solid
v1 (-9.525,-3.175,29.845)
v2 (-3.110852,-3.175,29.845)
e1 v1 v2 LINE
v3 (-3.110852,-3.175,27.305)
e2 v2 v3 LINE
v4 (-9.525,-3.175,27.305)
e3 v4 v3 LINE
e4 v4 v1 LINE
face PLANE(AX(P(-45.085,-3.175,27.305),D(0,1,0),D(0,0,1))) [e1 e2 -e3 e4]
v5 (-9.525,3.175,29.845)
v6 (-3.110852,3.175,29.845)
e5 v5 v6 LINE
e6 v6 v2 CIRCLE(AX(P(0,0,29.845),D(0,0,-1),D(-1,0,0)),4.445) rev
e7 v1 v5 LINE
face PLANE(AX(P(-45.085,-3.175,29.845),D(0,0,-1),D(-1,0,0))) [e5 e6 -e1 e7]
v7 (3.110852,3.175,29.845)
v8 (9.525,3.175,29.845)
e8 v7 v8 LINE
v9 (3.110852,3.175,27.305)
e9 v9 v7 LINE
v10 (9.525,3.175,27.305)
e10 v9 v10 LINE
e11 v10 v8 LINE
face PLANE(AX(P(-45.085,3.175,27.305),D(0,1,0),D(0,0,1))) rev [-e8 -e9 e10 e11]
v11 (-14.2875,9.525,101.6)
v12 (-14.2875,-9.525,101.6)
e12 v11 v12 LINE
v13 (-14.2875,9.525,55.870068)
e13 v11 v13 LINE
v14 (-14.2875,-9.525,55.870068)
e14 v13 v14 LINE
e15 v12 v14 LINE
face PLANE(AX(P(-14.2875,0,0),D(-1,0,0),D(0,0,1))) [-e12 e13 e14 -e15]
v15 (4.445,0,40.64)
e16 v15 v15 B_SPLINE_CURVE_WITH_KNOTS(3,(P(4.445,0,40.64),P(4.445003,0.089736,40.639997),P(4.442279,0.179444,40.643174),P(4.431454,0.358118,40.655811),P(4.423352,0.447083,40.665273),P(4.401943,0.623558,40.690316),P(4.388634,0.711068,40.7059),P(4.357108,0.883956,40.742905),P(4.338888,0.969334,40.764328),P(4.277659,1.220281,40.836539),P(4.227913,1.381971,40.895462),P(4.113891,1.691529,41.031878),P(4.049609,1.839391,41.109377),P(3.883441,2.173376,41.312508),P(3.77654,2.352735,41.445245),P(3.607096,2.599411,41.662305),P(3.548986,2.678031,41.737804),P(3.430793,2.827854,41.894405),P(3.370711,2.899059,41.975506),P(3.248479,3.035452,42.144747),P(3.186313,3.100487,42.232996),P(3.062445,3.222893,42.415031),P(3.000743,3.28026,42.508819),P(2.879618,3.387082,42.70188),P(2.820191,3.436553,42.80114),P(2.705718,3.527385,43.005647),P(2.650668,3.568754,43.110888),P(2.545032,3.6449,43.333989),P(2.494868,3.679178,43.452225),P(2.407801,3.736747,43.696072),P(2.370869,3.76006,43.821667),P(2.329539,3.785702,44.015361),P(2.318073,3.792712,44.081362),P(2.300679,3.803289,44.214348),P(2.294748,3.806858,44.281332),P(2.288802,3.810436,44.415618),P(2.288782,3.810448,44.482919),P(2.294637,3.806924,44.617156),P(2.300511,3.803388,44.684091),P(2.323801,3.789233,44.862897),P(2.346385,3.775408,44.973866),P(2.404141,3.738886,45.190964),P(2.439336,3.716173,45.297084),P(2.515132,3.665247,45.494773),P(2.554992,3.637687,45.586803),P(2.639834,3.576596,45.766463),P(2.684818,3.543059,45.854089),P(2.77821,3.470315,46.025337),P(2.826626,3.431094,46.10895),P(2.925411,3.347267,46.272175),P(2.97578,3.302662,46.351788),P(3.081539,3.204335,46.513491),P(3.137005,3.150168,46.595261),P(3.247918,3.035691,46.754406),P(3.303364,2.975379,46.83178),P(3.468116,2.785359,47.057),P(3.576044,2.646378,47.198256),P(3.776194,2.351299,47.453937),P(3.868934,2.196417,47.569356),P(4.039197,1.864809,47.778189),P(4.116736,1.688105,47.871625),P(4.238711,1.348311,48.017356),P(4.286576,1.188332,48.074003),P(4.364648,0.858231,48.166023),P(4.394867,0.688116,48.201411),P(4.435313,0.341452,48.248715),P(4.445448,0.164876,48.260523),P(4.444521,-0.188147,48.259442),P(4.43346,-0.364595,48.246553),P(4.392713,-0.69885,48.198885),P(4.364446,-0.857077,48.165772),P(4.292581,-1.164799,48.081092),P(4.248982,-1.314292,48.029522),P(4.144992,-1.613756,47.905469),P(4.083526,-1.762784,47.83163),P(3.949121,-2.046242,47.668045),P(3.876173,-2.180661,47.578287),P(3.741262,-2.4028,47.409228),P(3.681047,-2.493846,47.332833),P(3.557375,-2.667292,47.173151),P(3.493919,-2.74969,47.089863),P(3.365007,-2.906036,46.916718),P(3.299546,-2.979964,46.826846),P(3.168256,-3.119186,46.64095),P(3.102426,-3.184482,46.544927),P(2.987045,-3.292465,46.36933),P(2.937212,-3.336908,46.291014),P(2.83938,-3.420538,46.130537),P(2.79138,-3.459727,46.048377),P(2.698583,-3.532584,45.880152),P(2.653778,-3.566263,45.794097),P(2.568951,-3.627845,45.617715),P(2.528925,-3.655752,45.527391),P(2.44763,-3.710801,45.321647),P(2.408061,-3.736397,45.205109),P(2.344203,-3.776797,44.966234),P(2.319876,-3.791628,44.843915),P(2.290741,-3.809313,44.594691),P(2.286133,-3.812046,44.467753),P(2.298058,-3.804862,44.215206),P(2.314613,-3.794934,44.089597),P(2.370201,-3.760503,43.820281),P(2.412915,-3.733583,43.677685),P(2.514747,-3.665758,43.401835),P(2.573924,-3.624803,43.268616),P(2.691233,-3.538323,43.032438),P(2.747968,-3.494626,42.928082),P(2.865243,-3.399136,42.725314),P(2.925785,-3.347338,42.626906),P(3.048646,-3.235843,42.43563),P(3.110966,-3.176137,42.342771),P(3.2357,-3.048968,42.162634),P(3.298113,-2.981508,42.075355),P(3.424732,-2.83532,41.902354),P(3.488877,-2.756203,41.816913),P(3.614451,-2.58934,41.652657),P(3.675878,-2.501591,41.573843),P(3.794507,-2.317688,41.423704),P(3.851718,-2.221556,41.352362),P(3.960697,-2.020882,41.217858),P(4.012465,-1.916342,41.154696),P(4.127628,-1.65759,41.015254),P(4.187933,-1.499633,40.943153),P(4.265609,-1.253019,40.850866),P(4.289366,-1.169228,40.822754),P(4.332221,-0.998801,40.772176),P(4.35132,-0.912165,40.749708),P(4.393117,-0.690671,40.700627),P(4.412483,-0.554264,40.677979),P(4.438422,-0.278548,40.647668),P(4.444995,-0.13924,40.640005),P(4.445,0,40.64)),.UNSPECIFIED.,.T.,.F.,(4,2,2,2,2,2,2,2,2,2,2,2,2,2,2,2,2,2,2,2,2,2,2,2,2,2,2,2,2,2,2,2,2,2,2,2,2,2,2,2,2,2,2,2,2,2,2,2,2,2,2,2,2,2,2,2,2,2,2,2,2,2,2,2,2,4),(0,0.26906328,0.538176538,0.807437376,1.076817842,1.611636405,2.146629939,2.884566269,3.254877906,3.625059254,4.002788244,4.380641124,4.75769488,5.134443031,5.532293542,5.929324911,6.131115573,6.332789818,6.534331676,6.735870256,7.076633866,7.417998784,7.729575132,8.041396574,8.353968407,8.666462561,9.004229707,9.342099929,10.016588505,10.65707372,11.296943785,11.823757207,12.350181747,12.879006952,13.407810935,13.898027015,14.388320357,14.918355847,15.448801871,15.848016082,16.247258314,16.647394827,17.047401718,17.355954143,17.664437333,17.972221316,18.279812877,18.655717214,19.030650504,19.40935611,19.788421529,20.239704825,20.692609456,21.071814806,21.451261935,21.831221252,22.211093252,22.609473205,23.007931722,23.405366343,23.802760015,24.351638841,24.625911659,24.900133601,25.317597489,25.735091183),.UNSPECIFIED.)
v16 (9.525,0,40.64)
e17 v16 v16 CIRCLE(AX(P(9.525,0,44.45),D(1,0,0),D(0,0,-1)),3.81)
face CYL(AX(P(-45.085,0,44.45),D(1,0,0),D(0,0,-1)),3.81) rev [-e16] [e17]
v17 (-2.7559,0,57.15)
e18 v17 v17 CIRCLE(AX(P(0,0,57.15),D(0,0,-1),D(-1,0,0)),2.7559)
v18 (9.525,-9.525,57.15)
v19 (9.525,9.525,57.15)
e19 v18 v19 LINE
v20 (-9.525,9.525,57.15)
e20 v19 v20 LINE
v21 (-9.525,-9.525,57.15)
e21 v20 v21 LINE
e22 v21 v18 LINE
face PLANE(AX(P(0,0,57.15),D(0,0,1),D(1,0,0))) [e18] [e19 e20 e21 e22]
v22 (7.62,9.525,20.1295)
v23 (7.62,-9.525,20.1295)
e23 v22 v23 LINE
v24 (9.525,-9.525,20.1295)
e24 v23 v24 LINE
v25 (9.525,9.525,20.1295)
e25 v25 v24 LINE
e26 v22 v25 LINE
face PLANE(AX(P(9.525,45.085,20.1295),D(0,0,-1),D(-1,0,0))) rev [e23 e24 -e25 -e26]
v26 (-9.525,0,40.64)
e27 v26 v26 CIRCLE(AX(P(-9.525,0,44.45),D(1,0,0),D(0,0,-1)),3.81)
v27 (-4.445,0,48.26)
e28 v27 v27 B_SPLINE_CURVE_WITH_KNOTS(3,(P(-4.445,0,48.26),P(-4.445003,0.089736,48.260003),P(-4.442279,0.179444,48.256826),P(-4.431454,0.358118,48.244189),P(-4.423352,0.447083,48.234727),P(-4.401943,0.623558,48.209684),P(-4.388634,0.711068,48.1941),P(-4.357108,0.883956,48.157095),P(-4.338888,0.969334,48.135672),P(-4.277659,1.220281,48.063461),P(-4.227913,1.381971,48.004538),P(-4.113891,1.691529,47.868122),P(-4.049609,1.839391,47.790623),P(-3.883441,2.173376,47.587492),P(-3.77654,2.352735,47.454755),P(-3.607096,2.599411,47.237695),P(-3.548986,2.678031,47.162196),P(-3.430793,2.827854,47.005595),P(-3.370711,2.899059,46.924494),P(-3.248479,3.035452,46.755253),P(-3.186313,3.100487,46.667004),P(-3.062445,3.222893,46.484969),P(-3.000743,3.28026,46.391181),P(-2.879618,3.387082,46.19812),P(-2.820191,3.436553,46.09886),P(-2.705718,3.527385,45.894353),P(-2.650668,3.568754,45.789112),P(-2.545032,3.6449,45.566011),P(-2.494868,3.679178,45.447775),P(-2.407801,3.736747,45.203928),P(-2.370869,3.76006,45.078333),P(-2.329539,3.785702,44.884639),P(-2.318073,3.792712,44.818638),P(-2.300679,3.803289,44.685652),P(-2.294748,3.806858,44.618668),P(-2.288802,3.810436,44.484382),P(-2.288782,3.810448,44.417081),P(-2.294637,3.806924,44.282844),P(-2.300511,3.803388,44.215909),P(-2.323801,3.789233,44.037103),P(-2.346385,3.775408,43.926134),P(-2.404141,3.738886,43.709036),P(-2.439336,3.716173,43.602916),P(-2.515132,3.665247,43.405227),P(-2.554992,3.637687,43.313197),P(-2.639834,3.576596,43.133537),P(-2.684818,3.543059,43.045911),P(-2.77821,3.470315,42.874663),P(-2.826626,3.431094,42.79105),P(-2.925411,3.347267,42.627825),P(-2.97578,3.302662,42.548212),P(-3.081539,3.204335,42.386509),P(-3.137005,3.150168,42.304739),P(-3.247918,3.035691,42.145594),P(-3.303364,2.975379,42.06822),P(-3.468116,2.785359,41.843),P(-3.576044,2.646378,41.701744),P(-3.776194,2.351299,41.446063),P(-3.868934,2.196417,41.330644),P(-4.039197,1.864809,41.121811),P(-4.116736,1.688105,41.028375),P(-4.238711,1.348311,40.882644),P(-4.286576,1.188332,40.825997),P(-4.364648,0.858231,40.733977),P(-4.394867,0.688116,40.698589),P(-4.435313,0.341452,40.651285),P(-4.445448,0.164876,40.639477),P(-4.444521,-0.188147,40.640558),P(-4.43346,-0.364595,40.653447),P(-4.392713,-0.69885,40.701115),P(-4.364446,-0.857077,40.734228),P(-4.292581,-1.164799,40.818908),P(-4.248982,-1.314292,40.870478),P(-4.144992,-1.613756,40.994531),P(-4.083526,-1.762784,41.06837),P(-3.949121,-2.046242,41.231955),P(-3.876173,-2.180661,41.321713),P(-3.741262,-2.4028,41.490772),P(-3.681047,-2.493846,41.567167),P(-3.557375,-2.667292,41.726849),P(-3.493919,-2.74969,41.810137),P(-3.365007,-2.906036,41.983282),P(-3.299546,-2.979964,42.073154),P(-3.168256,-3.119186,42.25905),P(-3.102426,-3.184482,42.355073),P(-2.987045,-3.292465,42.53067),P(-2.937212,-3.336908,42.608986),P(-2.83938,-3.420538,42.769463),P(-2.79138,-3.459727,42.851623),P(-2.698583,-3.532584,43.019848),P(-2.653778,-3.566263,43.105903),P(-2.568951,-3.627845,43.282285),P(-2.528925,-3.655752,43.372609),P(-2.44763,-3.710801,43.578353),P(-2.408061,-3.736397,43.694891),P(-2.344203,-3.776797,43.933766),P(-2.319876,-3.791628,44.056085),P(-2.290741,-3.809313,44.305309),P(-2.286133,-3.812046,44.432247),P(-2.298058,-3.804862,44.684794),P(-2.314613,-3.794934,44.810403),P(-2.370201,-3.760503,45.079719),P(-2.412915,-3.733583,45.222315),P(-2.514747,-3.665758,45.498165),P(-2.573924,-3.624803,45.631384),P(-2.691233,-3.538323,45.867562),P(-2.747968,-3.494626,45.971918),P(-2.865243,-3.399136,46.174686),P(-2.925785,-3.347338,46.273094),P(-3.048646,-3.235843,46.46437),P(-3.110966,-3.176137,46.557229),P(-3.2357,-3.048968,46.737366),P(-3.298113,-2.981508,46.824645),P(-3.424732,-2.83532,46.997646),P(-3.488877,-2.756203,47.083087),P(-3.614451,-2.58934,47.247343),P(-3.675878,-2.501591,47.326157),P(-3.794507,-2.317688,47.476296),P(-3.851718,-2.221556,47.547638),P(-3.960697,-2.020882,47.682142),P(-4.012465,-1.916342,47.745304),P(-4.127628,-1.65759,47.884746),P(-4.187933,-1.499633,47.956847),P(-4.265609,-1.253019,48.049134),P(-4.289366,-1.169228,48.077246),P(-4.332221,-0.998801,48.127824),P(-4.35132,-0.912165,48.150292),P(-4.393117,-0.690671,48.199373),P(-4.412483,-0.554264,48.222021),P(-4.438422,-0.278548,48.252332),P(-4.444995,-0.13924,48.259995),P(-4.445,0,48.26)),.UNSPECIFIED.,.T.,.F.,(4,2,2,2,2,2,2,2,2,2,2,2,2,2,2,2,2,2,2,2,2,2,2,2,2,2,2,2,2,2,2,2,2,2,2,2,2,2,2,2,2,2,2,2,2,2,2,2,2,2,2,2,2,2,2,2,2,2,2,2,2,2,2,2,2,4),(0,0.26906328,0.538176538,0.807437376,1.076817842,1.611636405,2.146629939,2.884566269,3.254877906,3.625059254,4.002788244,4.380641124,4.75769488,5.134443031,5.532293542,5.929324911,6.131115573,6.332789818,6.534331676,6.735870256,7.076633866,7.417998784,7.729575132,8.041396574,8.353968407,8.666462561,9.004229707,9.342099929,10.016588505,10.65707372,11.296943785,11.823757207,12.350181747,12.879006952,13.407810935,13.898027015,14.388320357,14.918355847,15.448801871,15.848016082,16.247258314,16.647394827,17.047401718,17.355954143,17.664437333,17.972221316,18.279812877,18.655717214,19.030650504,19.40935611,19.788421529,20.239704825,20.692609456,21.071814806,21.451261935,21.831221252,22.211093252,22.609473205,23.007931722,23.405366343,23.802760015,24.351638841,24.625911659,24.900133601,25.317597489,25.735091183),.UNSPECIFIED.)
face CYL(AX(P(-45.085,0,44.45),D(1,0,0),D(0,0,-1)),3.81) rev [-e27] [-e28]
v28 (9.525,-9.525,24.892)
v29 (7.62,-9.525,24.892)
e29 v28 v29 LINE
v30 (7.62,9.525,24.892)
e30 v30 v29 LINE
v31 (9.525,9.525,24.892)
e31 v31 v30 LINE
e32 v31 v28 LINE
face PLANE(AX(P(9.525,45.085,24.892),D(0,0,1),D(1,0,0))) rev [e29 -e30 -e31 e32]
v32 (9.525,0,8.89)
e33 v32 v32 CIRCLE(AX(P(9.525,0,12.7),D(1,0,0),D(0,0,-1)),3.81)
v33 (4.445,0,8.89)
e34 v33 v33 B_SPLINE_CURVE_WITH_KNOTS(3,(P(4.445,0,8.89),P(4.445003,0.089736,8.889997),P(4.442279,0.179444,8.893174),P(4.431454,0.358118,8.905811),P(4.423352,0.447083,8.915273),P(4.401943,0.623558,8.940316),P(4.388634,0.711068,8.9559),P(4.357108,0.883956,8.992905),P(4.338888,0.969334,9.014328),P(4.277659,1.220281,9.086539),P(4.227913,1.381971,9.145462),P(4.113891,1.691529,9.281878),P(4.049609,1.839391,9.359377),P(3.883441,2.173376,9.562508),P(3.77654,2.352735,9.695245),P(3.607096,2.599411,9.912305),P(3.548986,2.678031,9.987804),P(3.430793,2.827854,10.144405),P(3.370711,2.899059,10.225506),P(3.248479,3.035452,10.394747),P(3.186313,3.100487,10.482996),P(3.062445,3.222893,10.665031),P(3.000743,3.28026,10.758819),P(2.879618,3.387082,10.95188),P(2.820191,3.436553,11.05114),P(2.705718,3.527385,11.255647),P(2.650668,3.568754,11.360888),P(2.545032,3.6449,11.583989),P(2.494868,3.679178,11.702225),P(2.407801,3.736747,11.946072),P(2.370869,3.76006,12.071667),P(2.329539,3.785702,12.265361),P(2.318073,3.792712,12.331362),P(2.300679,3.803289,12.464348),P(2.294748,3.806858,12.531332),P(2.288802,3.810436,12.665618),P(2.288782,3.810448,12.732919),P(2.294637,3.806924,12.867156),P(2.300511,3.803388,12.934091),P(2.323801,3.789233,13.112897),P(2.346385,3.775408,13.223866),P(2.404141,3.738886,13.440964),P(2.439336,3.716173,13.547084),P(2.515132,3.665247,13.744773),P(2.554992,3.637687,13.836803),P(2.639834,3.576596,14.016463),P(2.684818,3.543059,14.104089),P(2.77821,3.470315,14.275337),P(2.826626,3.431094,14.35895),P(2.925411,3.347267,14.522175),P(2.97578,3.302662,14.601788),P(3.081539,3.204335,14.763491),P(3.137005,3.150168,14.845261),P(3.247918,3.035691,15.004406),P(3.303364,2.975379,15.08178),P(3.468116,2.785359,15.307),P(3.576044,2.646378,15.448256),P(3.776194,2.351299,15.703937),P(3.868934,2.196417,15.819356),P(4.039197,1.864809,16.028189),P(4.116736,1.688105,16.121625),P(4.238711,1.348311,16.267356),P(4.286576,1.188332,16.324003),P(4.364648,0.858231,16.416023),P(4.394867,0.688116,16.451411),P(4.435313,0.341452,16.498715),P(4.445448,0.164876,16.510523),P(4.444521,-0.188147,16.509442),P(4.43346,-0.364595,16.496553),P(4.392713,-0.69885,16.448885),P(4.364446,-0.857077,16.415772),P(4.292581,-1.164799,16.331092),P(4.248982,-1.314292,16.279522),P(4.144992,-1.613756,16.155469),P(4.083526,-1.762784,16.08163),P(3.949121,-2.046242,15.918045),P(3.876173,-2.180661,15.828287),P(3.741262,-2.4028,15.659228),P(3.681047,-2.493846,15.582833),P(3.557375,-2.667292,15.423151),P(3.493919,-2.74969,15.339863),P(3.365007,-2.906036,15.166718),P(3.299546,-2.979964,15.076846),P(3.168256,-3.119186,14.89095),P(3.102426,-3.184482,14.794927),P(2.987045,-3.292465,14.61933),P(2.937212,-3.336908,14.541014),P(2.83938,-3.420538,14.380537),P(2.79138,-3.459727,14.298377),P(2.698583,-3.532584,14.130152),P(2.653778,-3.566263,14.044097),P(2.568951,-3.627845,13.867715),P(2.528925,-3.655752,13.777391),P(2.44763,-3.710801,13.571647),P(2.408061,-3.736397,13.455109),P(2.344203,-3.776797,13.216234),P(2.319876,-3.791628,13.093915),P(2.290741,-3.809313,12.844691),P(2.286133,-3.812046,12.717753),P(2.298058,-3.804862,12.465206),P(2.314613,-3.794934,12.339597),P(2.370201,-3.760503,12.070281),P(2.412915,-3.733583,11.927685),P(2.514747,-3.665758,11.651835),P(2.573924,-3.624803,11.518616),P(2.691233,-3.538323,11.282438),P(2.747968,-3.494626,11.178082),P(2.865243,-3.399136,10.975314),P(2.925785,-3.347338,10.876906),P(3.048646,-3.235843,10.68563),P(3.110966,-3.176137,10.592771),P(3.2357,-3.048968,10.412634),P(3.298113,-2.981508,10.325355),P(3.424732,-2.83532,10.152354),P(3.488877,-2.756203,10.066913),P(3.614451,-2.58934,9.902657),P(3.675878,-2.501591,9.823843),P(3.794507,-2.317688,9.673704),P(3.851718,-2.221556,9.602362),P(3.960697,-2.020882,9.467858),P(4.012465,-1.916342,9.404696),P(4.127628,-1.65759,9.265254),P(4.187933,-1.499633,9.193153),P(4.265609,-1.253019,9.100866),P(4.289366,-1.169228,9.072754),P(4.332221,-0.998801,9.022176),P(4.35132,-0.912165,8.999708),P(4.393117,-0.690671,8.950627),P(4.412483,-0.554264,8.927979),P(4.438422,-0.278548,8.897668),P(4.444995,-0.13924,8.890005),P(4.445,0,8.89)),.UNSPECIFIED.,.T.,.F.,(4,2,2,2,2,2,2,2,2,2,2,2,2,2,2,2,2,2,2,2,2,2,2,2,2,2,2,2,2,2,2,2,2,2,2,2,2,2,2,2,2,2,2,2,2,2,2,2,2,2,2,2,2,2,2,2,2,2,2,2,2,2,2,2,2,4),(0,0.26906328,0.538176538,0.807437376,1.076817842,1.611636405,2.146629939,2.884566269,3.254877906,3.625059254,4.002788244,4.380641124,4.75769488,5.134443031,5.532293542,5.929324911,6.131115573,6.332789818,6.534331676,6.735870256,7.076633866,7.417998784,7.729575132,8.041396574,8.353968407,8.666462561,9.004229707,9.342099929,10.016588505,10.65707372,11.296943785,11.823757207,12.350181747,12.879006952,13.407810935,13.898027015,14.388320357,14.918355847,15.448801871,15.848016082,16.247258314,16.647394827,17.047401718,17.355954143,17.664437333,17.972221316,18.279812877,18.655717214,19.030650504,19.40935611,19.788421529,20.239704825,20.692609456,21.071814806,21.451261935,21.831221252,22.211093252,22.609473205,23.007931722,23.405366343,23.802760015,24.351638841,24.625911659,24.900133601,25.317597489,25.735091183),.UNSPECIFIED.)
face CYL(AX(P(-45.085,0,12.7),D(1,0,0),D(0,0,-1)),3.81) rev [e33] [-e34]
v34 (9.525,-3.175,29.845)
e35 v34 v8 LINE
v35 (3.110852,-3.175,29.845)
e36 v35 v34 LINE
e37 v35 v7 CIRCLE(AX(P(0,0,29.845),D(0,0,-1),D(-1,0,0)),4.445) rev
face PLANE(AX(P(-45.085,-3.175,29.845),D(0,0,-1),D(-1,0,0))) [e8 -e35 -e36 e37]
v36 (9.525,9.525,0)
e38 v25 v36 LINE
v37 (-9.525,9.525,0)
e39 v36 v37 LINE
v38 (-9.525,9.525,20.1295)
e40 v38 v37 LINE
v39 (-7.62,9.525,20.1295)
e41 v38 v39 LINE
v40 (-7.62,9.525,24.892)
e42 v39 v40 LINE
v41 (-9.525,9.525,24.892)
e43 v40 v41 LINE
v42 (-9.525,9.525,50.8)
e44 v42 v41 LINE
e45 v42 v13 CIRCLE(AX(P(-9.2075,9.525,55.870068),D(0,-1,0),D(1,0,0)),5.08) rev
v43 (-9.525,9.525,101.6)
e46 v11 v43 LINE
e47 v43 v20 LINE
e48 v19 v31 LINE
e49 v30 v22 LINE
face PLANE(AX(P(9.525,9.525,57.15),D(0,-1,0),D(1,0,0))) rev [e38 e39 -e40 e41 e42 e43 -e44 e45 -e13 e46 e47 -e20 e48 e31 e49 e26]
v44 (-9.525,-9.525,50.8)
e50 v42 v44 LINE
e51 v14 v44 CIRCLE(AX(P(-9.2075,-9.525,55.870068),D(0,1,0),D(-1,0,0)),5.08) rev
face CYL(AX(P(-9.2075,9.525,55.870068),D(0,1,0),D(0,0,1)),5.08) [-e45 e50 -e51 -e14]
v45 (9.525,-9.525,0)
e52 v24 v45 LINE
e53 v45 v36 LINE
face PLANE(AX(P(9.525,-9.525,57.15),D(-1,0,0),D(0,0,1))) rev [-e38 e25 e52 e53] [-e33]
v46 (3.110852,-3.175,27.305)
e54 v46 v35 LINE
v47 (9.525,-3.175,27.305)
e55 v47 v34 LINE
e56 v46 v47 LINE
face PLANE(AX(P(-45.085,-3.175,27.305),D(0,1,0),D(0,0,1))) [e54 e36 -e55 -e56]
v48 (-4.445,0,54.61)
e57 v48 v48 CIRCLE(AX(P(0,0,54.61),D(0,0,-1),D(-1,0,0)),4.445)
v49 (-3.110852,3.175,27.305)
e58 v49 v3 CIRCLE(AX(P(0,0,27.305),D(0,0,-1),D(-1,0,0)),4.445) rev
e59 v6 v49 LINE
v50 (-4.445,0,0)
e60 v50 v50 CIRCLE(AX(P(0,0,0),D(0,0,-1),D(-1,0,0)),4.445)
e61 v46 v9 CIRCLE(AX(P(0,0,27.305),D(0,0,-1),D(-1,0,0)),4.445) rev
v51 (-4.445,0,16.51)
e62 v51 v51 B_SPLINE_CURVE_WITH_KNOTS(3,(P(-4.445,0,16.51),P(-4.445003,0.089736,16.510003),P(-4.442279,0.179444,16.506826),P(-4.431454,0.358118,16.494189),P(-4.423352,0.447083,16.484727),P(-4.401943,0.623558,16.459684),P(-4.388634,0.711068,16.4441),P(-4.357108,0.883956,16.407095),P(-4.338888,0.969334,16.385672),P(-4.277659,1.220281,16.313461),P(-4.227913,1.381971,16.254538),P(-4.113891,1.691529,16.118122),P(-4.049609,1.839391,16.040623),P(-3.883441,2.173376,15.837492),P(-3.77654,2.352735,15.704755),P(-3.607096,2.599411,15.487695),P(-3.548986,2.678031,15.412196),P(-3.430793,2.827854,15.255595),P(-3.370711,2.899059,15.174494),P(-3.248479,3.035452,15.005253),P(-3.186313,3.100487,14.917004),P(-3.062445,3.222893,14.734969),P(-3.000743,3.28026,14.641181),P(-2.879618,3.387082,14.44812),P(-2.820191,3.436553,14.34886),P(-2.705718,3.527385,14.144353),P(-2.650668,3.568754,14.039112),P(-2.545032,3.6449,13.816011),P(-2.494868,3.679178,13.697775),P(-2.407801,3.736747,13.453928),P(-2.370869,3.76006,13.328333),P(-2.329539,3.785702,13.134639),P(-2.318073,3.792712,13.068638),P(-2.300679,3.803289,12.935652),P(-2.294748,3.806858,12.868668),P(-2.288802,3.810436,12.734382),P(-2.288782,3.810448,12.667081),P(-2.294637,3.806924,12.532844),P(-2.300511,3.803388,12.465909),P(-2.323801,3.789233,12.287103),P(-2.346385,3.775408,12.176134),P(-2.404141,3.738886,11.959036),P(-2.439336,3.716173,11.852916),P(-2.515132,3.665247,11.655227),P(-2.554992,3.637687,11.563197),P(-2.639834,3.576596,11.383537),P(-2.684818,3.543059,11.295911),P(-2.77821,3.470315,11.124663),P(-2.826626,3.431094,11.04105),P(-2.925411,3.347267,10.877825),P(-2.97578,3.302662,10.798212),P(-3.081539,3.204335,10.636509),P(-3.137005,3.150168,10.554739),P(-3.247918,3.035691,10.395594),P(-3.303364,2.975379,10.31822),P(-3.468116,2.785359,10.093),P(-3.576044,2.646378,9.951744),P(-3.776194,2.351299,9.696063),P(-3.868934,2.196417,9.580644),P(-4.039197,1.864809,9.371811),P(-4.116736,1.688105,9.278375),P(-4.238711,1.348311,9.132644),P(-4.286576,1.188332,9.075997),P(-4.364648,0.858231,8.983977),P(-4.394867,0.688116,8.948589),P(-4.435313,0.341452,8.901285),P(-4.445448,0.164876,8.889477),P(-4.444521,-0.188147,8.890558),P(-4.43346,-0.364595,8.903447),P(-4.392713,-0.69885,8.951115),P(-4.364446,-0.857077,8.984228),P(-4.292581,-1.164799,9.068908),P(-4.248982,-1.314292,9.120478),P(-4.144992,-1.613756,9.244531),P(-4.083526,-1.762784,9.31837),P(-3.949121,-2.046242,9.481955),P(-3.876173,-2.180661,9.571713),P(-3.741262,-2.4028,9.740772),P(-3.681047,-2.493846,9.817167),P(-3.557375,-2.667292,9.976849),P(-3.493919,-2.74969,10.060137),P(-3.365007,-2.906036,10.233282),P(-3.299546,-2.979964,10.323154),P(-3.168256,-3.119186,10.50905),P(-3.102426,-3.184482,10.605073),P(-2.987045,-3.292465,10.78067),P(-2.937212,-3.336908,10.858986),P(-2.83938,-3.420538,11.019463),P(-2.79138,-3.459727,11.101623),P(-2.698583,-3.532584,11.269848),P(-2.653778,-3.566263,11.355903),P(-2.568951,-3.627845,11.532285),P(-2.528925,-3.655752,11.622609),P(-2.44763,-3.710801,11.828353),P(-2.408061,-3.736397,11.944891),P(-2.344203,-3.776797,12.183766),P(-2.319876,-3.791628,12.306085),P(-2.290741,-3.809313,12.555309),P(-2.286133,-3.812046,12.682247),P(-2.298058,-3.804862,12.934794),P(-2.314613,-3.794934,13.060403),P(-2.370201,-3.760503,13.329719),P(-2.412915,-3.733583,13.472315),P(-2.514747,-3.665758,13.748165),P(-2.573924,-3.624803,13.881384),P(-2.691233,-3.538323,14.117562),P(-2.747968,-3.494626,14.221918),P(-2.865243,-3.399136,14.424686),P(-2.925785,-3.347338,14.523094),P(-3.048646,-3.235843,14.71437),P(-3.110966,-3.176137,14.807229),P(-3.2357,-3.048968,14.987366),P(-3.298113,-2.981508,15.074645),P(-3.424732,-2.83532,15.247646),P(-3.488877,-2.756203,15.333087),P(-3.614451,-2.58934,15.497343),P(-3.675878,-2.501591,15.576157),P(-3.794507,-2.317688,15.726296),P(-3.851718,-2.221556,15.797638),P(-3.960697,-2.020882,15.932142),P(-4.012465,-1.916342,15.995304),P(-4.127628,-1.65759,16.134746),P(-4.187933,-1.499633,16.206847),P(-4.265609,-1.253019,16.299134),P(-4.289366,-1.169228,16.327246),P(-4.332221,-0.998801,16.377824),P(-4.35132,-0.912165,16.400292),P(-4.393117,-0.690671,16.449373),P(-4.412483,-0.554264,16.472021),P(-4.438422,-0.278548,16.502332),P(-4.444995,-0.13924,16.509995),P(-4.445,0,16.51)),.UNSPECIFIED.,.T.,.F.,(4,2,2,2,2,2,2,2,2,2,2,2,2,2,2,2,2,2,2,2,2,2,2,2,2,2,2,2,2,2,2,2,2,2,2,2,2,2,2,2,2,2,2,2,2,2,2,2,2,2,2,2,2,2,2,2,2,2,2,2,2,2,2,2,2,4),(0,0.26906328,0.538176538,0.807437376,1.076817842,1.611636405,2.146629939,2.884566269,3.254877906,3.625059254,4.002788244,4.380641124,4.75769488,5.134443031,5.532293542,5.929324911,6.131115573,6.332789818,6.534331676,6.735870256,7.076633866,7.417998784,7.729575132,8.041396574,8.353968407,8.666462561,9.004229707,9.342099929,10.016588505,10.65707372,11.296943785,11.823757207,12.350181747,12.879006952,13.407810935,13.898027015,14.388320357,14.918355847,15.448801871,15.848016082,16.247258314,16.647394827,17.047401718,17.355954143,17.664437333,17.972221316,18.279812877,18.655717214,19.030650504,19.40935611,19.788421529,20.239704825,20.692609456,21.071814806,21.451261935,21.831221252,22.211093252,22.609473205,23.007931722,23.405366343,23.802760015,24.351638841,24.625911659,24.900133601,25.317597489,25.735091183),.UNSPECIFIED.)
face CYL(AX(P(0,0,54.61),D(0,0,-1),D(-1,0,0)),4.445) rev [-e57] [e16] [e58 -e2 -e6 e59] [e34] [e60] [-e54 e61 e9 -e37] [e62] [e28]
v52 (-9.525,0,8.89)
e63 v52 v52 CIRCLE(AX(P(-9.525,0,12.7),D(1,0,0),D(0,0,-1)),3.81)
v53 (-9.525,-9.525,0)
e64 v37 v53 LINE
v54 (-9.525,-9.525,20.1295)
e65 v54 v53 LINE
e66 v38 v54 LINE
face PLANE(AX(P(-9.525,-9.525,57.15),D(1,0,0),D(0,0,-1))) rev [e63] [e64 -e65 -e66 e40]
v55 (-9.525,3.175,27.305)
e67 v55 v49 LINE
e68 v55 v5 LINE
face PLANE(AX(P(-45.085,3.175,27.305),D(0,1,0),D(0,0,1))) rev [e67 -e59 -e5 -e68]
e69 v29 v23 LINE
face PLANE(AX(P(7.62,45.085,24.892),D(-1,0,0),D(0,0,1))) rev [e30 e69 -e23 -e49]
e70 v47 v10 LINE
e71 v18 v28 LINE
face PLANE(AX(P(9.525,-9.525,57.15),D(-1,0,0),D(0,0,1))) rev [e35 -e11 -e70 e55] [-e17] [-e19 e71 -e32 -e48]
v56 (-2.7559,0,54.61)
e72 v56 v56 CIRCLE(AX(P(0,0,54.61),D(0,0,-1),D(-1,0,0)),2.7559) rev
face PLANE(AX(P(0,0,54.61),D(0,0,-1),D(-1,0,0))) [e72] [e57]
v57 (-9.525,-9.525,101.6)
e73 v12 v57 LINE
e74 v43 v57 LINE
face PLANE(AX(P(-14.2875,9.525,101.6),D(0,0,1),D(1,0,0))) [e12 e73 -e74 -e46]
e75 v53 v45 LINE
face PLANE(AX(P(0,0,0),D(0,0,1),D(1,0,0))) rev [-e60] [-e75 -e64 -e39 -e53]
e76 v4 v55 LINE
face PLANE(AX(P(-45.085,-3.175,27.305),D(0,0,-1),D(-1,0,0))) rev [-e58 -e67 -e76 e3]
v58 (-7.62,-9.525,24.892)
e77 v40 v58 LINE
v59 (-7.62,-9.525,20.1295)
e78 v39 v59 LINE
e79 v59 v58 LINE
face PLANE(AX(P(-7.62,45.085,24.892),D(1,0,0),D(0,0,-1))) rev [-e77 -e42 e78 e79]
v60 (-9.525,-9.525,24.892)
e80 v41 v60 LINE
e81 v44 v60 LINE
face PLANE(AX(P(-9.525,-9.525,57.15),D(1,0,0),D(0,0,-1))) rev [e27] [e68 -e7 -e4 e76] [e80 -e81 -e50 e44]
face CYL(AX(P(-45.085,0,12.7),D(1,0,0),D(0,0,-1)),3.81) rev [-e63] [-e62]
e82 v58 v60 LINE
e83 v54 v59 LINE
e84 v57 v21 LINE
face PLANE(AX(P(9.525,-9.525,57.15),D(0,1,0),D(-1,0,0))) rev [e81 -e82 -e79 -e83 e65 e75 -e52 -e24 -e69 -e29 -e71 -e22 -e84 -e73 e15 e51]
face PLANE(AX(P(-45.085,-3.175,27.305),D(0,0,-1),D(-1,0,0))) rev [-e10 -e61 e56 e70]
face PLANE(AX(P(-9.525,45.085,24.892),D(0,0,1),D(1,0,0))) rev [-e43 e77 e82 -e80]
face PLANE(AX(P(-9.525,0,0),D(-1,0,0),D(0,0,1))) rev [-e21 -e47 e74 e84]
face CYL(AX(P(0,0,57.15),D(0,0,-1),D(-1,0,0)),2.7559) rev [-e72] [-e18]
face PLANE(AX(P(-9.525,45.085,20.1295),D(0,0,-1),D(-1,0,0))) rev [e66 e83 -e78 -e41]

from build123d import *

# Parameters (mm, degrees)
SKETCH1_W           = 19.05
SKETCH1_H           = 19.05
BOSS_EXTRUDE1_DEPTH = 57.15
SKETCH2_R           = 2.7559
CUT_EXTRUDE1_DEPTH  = 57.15
SKETCH3_R           = 4.445
CUT_EXTRUDE2_DEPTH  = 54.61
SKETCH4_R           = 3.81
CUT_EXTRUDE3_DEPTH  = 54.61
SKETCH6_W           = 2.54
SKETCH6_H           = 6.35
CUT_EXTRUDE4_DEPTH  = 54.61
SKETCH7_W           = 1.905
SKETCH7_H           = 4.7625
CUT_EXTRUDE5_DEPTH  = 54.61
SKETCH8_W           = 6.35
SKETCH8_H           = 19.05
SKETCH8_W_2         = 44.45
BOSS_EXTRUDE2_DEPTH = 4.7625
FILLET2_R           = 5.08


with BuildPart() as part:
    # Sketch1 → Boss-Extrude1 (new body)
    with BuildSketch(Plane.XY):
        Rectangle(SKETCH1_W, SKETCH1_H)
    extrude(amount=BOSS_EXTRUDE1_DEPTH)

    # Sketch2 → Cut-Extrude1 (cut)
    with BuildSketch(Plane(origin=(0, 0, 0), x_dir=(-1, 0, 0), z_dir=(0, 0, -1))):
        Circle(SKETCH2_R)
    extrude(amount=-CUT_EXTRUDE1_DEPTH, mode=Mode.SUBTRACT)

    # Sketch3 → Cut-Extrude2 (cut)
    with BuildSketch(Plane(origin=(0, 0, 0), x_dir=(-1, 0, 0), z_dir=(0, 0, -1))):
        Circle(SKETCH3_R)
    extrude(amount=-CUT_EXTRUDE2_DEPTH, mode=Mode.SUBTRACT)

    # Sketch4 → Cut-Extrude3 (cut)
    with BuildSketch(Plane(origin=(9.525, 0, 0), x_dir=(0, 0, -1), z_dir=(1, 0, 0))):
        with Locations((-44.45, 0)):
            Circle(SKETCH4_R)
        with Locations((-12.7, 0)):
            Circle(SKETCH4_R)
    extrude(amount=-CUT_EXTRUDE3_DEPTH, mode=Mode.SUBTRACT)

    # Sketch6 → Cut-Extrude4 (cut)
    with BuildSketch(Plane(origin=(9.525, 0, 0), x_dir=(0, 0, -1), z_dir=(1, 0, 0))):
        with Locations((-28.575, 0)):
            Rectangle(SKETCH6_W, SKETCH6_H)
    extrude(amount=-CUT_EXTRUDE4_DEPTH, mode=Mode.SUBTRACT)

    # Sketch7 → Cut-Extrude5 (cut)
    with BuildSketch(Plane.XZ.offset(9.525)):
        with Locations((-8.5725, 22.51075)):
            Rectangle(SKETCH7_W, SKETCH7_H)
        with Locations((8.5725, 22.51075)):
            Rectangle(SKETCH7_W, SKETCH7_H)
    extrude(amount=-CUT_EXTRUDE5_DEPTH, mode=Mode.SUBTRACT)

    # Sketch8 → Boss-Extrude2 (add)
    with BuildSketch(Plane.ZY.offset(9.525)):
        with Locations((53.975, 0)):
            Rectangle(SKETCH8_W, SKETCH8_H)
        with Locations((79.375, 0)):
            Rectangle(SKETCH8_W_2, SKETCH8_H)
    extrude(amount=BOSS_EXTRUDE2_DEPTH)

    # Fillet2
    # the kernel refuses this fillet: 5.08 mm, written as the material it takes off along each edge
    with BuildSketch(Plane(origin=(-14.2875, 22.200171042, 50.8), x_dir=(1, 0, 0), z_dir=(0, -1, 0))) as fillet2_piece_1:
        with BuildLine():
            CenterArc((5.08, 5.070068417), FILLET2_R, 180, 86.416678302)
            Line((0, 5.070068417), (-0.1016, 5.070068417))
            Line((-0.1016, 5.070068417), (-0.1016, 0))
            Line((-0.1016, 0), (0, -0.1016))
            ThreePointArc((0, -0.1016), (2.38125, -0.1016), (4.75615, -0.101401368))
            Line((4.75615, -0.101401368), (4.7625, 0))
        make_face()
    extrude(amount=44.400342083, mode=Mode.SUBTRACT)


solid = part.part
